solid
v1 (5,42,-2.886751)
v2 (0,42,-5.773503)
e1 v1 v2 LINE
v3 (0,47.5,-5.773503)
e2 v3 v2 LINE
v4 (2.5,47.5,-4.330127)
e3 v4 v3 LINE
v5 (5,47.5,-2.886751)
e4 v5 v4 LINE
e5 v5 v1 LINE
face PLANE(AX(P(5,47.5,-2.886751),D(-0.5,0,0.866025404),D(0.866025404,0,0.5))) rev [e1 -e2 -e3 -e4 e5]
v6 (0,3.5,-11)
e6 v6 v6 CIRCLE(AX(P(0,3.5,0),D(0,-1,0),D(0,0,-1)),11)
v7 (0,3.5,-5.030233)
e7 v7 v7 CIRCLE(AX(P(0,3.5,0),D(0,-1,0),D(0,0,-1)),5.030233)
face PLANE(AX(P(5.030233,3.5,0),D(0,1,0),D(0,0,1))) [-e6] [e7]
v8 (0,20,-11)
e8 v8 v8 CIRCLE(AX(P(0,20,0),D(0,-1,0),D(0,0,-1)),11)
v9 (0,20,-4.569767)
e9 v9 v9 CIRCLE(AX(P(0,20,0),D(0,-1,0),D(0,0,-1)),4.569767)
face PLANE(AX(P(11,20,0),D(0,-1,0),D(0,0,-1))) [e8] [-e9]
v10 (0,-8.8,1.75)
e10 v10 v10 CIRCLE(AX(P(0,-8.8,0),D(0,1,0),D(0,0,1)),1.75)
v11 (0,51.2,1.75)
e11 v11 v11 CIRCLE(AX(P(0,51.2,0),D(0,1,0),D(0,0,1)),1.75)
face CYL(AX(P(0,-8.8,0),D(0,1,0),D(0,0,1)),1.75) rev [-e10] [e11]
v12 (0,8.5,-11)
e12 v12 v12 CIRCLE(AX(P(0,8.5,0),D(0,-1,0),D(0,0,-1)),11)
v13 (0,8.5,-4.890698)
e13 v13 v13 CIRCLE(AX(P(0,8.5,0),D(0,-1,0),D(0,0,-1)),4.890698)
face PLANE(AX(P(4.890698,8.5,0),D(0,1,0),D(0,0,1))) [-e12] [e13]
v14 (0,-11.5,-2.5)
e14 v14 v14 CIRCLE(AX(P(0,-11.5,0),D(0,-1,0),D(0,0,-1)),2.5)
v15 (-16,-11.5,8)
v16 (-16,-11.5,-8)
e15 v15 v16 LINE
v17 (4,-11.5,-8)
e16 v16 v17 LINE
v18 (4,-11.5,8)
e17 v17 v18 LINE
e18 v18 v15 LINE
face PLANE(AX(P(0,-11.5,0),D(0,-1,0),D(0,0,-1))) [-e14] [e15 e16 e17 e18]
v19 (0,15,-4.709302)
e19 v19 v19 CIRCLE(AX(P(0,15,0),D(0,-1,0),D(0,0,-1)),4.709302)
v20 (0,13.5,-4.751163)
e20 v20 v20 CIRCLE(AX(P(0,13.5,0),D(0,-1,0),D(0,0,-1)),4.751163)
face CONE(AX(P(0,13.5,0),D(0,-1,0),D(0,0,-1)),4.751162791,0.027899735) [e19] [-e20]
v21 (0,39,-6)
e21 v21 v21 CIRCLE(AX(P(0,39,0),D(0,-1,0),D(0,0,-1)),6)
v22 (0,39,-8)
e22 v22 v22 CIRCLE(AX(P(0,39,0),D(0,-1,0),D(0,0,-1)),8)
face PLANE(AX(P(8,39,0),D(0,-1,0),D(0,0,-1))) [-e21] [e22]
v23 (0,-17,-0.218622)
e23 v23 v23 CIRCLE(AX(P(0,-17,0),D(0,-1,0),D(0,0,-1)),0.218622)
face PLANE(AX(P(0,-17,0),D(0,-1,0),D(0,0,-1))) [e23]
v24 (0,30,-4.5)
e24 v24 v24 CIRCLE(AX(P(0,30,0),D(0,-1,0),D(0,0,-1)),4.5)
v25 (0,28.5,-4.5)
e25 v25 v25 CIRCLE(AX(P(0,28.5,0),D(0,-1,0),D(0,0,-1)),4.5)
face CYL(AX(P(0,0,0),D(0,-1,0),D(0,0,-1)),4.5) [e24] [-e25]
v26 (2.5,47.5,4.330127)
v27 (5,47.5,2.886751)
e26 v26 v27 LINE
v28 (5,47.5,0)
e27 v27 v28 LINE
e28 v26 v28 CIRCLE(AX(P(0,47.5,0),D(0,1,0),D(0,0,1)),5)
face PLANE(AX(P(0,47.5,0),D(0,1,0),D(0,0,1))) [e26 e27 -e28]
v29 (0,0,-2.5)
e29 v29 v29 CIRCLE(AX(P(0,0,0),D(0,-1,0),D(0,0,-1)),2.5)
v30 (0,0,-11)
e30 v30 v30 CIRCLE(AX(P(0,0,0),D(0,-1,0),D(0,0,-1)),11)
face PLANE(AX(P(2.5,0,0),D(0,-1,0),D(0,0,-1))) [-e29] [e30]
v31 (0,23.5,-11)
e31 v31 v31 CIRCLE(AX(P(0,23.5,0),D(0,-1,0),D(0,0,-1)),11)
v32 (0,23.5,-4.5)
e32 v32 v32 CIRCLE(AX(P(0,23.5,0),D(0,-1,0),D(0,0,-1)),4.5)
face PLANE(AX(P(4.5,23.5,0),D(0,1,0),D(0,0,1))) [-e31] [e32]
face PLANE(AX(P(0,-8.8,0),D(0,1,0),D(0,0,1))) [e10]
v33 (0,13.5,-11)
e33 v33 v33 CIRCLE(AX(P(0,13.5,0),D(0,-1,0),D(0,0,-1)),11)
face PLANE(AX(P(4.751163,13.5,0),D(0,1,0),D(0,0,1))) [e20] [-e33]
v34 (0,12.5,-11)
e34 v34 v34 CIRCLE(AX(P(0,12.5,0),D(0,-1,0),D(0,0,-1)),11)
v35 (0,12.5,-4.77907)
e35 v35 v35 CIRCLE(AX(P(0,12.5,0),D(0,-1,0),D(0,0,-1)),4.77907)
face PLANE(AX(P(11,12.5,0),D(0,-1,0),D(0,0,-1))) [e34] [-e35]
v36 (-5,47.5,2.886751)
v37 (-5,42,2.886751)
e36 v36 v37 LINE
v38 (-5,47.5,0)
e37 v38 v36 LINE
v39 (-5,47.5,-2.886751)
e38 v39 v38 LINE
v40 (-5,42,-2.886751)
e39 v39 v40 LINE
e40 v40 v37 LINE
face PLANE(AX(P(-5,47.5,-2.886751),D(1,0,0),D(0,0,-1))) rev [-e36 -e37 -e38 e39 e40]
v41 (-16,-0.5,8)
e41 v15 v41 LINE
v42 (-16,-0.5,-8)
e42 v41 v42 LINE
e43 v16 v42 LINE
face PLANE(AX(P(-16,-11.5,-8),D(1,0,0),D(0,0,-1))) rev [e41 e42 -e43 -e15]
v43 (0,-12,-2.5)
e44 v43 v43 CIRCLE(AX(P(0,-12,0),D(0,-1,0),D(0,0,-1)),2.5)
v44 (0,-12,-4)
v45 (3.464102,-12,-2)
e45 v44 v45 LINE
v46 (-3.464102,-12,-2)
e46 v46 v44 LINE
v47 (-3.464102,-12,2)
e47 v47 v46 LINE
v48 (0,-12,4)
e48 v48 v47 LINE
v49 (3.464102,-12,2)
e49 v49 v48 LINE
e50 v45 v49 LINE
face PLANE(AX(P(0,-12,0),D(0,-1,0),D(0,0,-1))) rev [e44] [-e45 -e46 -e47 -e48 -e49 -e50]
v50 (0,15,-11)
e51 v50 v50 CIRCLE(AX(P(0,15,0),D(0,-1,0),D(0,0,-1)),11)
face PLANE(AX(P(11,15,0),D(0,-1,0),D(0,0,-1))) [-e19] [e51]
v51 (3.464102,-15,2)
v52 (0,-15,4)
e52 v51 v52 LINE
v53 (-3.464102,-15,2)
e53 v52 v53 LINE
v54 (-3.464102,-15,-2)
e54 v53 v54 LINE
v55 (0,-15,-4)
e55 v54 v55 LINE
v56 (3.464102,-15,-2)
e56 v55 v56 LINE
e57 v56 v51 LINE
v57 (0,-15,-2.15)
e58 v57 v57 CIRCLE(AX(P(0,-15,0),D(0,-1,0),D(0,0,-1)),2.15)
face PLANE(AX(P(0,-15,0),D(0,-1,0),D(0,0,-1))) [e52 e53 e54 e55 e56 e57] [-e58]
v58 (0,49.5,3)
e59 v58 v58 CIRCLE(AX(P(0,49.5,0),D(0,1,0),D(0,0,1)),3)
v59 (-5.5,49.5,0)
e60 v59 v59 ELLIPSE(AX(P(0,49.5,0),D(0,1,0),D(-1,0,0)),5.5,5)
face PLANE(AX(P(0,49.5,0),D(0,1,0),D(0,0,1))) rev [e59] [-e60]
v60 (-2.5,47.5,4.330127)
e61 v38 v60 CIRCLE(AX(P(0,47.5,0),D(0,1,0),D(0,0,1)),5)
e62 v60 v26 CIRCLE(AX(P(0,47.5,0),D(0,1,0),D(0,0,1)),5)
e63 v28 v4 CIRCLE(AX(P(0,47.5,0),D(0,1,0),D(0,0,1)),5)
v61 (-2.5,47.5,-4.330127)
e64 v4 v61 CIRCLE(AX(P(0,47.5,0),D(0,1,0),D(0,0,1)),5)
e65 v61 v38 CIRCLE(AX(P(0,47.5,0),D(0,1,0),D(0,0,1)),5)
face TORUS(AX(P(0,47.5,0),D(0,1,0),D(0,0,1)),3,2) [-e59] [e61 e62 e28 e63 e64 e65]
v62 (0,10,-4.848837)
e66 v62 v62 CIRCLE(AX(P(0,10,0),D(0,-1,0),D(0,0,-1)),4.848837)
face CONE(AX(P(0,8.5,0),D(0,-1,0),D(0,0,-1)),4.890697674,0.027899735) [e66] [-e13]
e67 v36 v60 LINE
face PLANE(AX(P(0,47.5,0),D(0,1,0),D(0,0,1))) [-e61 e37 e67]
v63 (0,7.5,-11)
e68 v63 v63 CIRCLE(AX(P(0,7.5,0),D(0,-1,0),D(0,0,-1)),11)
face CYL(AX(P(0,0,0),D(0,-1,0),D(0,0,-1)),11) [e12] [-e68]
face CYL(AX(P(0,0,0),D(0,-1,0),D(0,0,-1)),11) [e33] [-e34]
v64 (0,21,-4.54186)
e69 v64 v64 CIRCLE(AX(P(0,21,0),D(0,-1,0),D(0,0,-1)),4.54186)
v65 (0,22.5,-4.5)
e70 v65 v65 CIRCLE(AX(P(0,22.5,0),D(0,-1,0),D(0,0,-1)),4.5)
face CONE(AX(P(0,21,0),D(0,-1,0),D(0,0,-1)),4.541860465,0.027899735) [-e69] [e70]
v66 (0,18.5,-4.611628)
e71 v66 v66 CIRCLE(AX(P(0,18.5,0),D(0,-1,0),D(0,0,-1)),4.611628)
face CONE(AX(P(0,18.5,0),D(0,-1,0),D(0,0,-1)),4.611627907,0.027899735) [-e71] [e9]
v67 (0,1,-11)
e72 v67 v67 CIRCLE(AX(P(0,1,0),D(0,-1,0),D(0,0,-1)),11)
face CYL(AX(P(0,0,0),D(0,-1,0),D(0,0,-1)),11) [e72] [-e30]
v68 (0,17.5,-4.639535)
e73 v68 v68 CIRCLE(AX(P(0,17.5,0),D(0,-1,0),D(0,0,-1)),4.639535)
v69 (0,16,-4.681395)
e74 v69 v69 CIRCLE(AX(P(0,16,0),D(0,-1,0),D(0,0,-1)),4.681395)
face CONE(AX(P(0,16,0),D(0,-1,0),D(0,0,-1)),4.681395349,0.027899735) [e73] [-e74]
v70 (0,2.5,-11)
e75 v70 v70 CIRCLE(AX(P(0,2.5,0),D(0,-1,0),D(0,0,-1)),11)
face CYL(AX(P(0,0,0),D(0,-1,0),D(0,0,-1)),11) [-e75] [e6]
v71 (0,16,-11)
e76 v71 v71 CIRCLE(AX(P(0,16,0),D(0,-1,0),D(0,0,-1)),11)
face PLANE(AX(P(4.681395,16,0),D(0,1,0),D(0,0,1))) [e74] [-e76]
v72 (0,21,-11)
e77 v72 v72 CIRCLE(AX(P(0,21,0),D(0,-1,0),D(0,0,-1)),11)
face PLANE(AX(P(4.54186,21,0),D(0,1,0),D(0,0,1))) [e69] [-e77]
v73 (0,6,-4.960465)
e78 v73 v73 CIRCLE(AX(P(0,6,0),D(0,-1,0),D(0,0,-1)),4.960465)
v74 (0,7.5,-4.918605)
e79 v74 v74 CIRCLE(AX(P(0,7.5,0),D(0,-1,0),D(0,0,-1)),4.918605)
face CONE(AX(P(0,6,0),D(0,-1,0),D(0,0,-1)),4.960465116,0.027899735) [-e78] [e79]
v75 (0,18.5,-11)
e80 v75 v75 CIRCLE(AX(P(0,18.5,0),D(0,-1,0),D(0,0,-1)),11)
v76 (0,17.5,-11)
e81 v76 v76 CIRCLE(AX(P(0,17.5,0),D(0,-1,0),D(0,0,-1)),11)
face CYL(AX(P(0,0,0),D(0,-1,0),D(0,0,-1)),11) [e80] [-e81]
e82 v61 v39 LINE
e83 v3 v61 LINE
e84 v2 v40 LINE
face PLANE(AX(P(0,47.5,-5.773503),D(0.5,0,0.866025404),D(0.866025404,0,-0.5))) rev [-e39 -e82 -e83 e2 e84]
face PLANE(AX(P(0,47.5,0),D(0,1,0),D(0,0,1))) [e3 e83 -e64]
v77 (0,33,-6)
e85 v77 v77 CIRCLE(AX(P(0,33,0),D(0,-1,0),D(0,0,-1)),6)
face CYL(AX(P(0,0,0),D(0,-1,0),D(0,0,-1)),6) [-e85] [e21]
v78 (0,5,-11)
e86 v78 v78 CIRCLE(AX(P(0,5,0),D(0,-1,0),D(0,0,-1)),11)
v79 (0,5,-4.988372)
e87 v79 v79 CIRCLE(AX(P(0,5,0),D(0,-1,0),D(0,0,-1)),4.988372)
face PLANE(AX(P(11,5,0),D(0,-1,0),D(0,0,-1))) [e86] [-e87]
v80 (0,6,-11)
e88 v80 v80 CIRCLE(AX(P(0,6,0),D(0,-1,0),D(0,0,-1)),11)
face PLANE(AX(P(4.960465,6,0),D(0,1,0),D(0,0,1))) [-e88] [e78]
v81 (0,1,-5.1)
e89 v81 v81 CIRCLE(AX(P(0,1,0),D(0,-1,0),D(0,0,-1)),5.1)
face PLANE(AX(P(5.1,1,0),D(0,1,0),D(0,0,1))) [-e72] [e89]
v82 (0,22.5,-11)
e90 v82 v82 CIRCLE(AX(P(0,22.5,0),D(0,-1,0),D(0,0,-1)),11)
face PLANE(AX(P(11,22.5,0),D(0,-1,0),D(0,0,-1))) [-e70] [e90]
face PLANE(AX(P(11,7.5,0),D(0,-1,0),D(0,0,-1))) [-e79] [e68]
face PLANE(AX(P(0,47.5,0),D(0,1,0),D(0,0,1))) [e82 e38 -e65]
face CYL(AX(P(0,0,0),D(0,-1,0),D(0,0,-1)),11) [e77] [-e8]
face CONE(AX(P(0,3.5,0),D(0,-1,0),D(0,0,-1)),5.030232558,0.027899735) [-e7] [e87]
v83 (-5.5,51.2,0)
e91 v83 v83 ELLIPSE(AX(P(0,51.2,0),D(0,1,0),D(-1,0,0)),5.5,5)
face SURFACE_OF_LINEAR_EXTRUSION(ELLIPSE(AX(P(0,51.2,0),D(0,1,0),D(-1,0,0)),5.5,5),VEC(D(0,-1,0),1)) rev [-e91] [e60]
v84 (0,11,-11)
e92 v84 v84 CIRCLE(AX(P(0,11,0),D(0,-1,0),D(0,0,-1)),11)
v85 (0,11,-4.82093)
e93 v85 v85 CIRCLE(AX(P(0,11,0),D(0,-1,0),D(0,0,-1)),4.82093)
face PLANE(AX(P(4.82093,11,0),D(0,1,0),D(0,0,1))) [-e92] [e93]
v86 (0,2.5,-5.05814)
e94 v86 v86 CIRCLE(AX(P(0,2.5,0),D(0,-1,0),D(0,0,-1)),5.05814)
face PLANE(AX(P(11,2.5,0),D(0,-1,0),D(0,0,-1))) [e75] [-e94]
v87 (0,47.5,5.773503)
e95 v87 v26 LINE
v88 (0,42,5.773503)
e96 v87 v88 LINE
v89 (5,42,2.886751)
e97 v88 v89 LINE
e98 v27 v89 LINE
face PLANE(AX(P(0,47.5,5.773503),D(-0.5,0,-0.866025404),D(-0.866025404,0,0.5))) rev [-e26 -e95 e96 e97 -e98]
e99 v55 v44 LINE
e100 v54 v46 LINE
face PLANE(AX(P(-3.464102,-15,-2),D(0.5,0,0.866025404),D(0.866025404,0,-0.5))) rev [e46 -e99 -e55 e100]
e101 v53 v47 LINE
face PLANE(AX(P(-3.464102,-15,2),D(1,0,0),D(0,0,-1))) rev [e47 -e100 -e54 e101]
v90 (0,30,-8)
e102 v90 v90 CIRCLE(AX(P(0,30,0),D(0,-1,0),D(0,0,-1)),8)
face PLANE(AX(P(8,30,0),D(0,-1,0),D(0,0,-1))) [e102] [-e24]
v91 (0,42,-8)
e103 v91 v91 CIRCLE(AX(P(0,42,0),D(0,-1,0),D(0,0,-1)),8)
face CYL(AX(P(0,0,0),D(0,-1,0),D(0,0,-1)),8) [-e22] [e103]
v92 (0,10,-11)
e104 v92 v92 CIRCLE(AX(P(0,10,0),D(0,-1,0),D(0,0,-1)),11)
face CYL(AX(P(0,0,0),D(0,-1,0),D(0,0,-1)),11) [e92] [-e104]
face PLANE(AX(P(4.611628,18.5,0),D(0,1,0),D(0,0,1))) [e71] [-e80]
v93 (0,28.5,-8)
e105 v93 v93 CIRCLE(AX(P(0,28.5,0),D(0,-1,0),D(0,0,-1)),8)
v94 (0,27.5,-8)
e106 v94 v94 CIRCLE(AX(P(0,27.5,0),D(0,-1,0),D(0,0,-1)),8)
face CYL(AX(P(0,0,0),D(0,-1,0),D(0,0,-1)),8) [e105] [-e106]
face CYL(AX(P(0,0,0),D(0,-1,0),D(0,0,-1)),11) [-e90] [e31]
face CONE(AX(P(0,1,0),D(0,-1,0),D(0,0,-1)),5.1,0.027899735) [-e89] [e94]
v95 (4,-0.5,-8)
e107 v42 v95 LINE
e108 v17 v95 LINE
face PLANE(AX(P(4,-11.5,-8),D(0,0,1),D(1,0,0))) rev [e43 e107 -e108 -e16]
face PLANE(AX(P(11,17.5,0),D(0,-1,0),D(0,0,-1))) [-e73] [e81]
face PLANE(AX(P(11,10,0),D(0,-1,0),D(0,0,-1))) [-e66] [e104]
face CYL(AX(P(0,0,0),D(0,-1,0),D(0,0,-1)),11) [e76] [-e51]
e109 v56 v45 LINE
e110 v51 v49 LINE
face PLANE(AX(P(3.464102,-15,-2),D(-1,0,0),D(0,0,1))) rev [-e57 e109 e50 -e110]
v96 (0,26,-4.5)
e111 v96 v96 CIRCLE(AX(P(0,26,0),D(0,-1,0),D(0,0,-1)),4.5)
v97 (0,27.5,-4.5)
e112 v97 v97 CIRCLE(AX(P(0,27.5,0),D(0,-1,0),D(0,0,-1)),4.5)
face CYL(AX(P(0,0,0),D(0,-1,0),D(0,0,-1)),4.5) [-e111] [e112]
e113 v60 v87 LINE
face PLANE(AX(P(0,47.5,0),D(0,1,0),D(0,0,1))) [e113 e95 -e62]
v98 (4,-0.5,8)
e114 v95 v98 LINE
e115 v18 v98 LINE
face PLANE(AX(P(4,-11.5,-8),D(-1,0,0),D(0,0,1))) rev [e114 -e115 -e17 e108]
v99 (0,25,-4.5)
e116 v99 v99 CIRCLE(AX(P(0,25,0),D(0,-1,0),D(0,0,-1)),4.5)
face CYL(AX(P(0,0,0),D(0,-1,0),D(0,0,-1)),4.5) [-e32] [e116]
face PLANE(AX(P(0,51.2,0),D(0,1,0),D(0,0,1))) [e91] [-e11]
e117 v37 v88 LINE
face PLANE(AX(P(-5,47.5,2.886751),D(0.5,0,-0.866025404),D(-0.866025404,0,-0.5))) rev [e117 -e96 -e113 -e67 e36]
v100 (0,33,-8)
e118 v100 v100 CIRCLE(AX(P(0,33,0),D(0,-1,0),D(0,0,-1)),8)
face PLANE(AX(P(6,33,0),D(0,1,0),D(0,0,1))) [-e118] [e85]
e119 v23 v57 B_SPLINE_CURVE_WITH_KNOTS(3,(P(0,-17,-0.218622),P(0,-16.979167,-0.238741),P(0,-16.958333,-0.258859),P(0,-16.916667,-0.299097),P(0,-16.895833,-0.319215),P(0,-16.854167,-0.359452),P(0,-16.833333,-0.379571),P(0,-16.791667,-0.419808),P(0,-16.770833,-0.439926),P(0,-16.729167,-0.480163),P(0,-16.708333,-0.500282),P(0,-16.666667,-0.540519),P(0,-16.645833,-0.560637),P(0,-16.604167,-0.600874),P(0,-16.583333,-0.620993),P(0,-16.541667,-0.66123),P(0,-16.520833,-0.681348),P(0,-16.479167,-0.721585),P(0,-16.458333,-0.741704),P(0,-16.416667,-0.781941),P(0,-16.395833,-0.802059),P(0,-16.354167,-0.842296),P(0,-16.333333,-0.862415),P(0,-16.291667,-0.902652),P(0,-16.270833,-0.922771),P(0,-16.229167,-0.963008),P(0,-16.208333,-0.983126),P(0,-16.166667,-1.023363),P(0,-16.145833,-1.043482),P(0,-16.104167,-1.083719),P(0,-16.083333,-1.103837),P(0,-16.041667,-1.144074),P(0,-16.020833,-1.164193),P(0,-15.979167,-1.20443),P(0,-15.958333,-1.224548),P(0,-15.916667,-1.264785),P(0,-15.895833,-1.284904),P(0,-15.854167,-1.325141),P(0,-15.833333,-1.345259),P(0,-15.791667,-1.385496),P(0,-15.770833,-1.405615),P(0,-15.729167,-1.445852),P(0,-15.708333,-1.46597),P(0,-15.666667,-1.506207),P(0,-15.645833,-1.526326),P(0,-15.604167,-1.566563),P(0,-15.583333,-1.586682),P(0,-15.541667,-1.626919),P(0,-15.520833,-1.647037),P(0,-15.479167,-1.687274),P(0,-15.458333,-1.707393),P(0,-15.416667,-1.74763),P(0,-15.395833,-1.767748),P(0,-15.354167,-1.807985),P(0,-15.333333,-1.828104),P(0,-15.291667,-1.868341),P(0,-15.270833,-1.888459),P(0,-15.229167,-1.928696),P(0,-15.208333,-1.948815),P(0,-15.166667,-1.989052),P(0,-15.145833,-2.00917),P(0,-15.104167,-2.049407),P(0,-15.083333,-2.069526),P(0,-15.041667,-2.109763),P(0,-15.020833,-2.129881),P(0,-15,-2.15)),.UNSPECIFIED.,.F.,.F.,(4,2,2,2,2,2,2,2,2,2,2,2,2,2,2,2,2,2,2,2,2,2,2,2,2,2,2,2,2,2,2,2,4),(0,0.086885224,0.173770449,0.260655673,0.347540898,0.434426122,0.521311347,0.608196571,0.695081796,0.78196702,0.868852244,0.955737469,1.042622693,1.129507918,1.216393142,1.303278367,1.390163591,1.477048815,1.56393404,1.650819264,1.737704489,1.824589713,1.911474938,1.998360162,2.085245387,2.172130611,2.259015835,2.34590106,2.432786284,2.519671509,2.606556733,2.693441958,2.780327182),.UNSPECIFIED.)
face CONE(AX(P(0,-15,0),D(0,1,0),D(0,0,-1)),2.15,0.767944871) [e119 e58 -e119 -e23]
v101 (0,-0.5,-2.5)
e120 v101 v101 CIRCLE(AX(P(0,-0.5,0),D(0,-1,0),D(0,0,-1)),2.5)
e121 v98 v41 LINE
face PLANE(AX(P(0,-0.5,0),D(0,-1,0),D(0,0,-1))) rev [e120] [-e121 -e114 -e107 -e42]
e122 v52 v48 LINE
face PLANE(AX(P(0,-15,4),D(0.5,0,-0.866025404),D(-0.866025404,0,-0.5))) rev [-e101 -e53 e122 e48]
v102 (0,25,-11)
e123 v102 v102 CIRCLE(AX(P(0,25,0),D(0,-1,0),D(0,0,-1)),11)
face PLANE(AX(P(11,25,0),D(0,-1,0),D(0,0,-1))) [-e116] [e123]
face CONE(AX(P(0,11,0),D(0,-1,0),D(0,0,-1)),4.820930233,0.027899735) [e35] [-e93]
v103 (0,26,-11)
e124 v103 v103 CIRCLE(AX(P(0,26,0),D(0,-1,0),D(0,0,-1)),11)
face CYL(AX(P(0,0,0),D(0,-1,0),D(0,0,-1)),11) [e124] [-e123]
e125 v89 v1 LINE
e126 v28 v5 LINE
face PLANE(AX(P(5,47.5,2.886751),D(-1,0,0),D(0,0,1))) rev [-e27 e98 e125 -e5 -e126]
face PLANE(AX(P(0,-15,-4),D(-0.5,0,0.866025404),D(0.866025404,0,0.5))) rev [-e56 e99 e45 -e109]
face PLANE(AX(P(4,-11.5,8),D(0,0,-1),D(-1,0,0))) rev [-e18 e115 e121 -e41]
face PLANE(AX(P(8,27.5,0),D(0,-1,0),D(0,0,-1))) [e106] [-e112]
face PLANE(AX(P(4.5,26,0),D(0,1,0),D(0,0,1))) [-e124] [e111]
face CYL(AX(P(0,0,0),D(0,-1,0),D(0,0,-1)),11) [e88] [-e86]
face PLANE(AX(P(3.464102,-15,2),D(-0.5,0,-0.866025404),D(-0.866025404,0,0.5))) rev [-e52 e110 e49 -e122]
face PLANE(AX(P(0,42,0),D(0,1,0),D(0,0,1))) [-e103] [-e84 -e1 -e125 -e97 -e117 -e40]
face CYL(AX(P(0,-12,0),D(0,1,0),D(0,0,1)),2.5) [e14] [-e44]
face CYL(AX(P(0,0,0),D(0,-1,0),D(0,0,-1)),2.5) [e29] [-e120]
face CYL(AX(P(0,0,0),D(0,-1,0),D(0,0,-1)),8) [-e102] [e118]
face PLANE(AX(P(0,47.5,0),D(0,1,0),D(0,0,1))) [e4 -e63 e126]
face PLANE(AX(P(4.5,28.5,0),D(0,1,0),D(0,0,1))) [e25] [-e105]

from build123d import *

# Parameters (mm, degrees)
SALIENTE_EXTRUIR1_DEPTH = 5.5
CROQUIS3_R              = 5
SALIENTE_EXTRUIR2_DEPTH = 2
REDONDEO1_R             = 2
CROQUIS4_RX             = 5.5
CROQUIS4_RY             = 5
SALIENTE_EXTRUIR3_DEPTH = 1.7
CROQUIS5_W              = 20
CROQUIS5_H              = 16
SALIENTE_EXTRUIR4_DEPTH = 11
SALIENTE_EXTRUIR5_START = 0.5
CROQUIS6_R              = 2.5
SALIENTE_EXTRUIR5_DEPTH = 0.5
SALIENTE_EXTRUIR6_DEPTH = 3
CROQUIS8_R              = 2.15
SALIENTE_EXTRUIR7_DEPTH = 2
SALIENTE_EXTRUIR7_TAPER = 44
CROQUIS9_R              = 1.75
CORTAR_EXTRUIR1_DEPTH   = 60


with BuildPart() as part:
    # Croquis1 → Revolución1 (revolve)
    with BuildSketch(Plane.XY, mode=Mode.PRIVATE) as revoluci_n1_sk:
        Polygon((0, 0), (0, 42), (8, 42), (8, 39), (6, 39), (6, 33), (8, 33), (8, 30), (4.5, 30), (4.5, 28.5), (8, 28.5), (8, 27.5), (4.5, 27.5), (4.5, 26), (11, 26), (11, 25), (4.5, 25), (4.5, 23.5), (11, 23.5), (11, 22.5), (4.5, 22.5), (4.541860465, 21), (11, 21), (11, 20), (4.569767442, 20), (4.611627907, 18.5), (11, 18.5), (11, 17.5), (4.639534884, 17.5), (4.681395349, 16), (11, 16), (11, 15), (4.709302326, 15), (4.751162791, 13.5), (11, 13.5), (11, 12.5), (4.779069767, 12.5), (4.820930233, 11), (11, 11), (11, 10), (4.848837209, 10), (4.890697674, 8.5), (11, 8.5), (11, 7.5), (4.918604651, 7.5), (4.960465116, 6), (11, 6), (11, 5), (4.988372093, 5), (5.030232558, 3.5), (11, 3.5), (11, 2.5), (5.058139535, 2.5), (5.1, 1), (11, 1), (11, 0), (2.5, 0), (2.5, -0.5), (0, -0.5), align=None)
    revolve(revoluci_n1_sk.sketch.rotate(Axis((0, 0, 0), (0, 1, 0)), 90), axis=Axis((0, 0, 0), (0, 1, 0)))

    # Croquis2 → Saliente-Extruir1 (add)
    with BuildSketch(Plane(origin=(0, 42, 0), x_dir=(1, 0, 0), z_dir=(0, 1, 0))):
        Polygon((0, 5.773502692), (-5, 2.886751346), (-5, -2.886751346), (0, -5.773502692), (5, -2.886751346), (5, 2.886751346), align=None)
    extrude(amount=SALIENTE_EXTRUIR1_DEPTH)

    # Croquis3 → Saliente-Extruir2 (add)
    with BuildSketch(Plane(origin=(0, 47.5, 0), x_dir=(1, 0, 0), z_dir=(0, 1, 0))):
        with Locations(Location((0, 0, 0), (0, 0, 60))):
            Circle(CROQUIS3_R)
    extrude(amount=SALIENTE_EXTRUIR2_DEPTH)

    # Redondeo1
    redondeo1_edges = [part.edges().sort_by_distance(p)[0] for p in [
        (-2.5, 49.5, 4.330127019),
    ]]
    fillet(redondeo1_edges, radius=REDONDEO1_R - 0.0001)  # a hair under: the kernel refuses the full size

    # Croquis4 → Saliente-Extruir3 (add)
    with BuildSketch(Plane(origin=(0, 49.5, 0), x_dir=(1, 0, 0), z_dir=(0, 1, 0))):
        with Locations(Location((0, 0), (0, 0, -180))):
            Ellipse(CROQUIS4_RX, CROQUIS4_RY)
    extrude(amount=SALIENTE_EXTRUIR3_DEPTH)

    # Croquis5 → Saliente-Extruir4 (add)
    with BuildSketch(Plane(origin=(0, -0.5, 0), x_dir=(-1, 0, 0), z_dir=(0, -1, 0))):
        with Locations((6, 0)):
            Rectangle(CROQUIS5_W, CROQUIS5_H)
    extrude(amount=SALIENTE_EXTRUIR4_DEPTH)

    # Croquis6 → Saliente-Extruir5 (add)
    with BuildSketch(Plane.XZ.offset(11.5).offset(SALIENTE_EXTRUIR5_START)):
        with Locations(Location((0, 0, 0), (0, 0, 270))):
            Circle(CROQUIS6_R)
    extrude(amount=-SALIENTE_EXTRUIR5_DEPTH)

    # Croquis7 → Saliente-Extruir6 (add)
    with BuildSketch(Plane.XZ.offset(12)):
        Polygon((0, -4), (3.464101615, -2), (3.464101615, 2), (0, 4), (-3.464101615, 2), (-3.464101615, -2), align=None)
    extrude(amount=SALIENTE_EXTRUIR6_DEPTH)

    # Croquis8 → Saliente-Extruir7 (add)
    with BuildSketch(Plane.XZ.offset(15)):
        Circle(CROQUIS8_R)
    extrude(amount=SALIENTE_EXTRUIR7_DEPTH, taper=SALIENTE_EXTRUIR7_TAPER)

    # Croquis9 → Cortar-Extruir1 (cut)
    with BuildSketch(Plane(origin=(0, 51.2, 0), x_dir=(1, 0, 0), z_dir=(0, 1, 0))):
        with Locations(Location((0, 0, 0), (0, 0, 270))):
            Circle(CROQUIS9_R)
    extrude(amount=-CORTAR_EXTRUIR1_DEPTH, mode=Mode.SUBTRACT)


solid = part.part
